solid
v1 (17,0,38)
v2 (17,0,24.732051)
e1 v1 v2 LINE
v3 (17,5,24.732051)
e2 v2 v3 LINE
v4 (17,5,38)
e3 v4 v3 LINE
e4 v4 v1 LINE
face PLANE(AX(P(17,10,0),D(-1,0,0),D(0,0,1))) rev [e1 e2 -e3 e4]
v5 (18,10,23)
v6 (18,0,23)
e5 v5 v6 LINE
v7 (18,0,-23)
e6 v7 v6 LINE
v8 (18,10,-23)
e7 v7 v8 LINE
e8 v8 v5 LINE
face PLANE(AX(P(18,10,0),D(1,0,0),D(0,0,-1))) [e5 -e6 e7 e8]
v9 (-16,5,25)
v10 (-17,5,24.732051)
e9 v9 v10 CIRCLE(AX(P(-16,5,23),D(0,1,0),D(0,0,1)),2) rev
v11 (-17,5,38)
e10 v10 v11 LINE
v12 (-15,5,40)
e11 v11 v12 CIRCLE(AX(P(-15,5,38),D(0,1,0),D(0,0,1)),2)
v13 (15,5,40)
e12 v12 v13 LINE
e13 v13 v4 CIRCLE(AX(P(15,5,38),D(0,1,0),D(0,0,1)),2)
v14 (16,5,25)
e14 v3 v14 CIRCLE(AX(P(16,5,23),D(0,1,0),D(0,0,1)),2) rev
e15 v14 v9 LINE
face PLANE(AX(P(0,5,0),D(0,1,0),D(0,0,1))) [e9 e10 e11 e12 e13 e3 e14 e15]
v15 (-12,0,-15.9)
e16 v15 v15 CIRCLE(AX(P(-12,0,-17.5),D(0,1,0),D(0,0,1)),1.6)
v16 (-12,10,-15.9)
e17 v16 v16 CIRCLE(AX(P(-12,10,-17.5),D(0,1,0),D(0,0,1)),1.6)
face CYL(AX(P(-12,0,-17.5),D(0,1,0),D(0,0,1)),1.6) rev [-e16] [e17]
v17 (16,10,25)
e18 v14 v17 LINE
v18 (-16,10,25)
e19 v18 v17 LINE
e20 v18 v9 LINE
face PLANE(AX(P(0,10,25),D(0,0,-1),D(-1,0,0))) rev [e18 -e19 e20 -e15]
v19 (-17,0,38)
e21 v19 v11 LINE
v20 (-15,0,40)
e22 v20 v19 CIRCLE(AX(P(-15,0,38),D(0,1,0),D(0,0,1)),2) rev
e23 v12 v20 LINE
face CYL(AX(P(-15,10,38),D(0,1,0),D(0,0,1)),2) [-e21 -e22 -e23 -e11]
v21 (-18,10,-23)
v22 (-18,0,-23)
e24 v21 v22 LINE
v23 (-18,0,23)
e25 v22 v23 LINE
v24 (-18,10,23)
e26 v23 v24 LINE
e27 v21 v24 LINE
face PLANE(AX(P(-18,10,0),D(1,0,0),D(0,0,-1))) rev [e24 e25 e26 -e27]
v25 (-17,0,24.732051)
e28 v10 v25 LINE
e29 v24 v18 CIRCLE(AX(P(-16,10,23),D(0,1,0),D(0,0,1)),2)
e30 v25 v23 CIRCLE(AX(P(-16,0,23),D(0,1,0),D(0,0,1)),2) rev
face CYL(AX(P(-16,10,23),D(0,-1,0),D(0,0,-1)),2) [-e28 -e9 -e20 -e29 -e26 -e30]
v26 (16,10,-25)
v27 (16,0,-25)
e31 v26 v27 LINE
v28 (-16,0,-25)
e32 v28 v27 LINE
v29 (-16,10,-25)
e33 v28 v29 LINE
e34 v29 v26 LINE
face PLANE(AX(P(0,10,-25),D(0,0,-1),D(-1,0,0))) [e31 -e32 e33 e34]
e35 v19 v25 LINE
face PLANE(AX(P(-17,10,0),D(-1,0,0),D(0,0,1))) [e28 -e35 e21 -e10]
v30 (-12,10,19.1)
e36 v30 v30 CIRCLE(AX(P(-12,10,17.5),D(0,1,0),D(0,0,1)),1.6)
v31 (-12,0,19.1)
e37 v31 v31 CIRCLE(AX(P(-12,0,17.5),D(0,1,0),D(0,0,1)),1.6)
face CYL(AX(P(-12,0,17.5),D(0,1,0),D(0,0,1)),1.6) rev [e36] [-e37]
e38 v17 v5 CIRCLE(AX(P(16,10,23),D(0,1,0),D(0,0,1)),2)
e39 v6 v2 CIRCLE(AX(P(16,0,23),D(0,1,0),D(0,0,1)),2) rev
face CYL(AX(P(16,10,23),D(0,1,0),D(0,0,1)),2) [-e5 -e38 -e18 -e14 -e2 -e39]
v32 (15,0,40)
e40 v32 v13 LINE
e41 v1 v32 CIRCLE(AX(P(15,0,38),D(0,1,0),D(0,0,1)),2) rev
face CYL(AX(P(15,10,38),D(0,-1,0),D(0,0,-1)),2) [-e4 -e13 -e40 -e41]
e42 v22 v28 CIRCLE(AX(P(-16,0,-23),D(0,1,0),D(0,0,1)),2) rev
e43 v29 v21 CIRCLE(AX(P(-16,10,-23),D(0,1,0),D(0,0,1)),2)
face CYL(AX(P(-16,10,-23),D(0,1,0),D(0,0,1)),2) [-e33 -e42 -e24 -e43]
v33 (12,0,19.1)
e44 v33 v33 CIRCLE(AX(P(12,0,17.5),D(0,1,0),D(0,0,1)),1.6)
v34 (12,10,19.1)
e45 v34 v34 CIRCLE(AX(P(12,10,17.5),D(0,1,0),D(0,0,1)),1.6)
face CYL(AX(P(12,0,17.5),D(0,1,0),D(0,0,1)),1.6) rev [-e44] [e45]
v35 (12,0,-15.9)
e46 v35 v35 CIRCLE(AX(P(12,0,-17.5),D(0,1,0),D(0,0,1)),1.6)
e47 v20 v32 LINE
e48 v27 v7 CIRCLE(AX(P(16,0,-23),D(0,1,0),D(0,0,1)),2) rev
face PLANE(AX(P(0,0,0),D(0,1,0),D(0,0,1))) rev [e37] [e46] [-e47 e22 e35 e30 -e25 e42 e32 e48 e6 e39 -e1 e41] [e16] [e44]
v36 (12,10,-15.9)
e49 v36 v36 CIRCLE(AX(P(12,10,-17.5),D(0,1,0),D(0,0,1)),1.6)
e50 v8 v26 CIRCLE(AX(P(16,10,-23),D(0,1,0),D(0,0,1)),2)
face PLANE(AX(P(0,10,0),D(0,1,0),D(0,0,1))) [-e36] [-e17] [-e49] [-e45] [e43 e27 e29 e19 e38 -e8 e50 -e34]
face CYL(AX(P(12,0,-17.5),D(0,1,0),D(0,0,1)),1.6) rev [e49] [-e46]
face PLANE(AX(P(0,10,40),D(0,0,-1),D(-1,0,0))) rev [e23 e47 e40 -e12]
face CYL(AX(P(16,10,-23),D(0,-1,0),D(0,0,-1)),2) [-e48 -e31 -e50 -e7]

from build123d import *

# Parameters (mm, degrees)
SKETCH_1_W          = 36
SKETCH_1_H          = 50
SKETCH_1_W_2        = 34
SKETCH_1_H_2        = 15
EXTRUDE_1_DEPTH     = 10
SKETCH_2_R          = 1.6
CUT_EXTRUDE_1_DEPTH = 10
SKETCH_3_W          = 34
SKETCH_3_H          = 15
CUT_EXTRUDE_2_DEPTH = 5
FILLET_1_R          = 2


with BuildPart() as part:
    # 草图1 → 凸台-拉伸1 (new body)
    with BuildSketch(Plane(origin=(0, 0, 0), x_dir=(1, 0, 0), z_dir=(0, 1, 0))):
        Rectangle(SKETCH_1_W, SKETCH_1_H)
        with Locations((0, -32.5)):
            Rectangle(SKETCH_1_W_2, SKETCH_1_H_2)
    extrude(amount=EXTRUDE_1_DEPTH)

    # 草图2 → 切除-拉伸1 (cut)
    with BuildSketch(Plane(origin=(0, 10, 0), x_dir=(1, 0, 0), z_dir=(0, 1, 0))):
        with Locations(Location((12, 17.5, 0), (0, 0, 270))):
            Circle(SKETCH_2_R)
        with Locations(Location((-12, 17.5, 0), (0, 0, 270))):
            Circle(SKETCH_2_R)
        with Locations(Location((-12, -17.5, 0), (0, 0, 270))):
            Circle(SKETCH_2_R)
        with Locations(Location((12, -17.5, 0), (0, 0, 270))):
            Circle(SKETCH_2_R)
    extrude(amount=-CUT_EXTRUDE_1_DEPTH, mode=Mode.SUBTRACT)

    # 草图3 → 切除-拉伸2 (cut)
    with BuildSketch(Plane(origin=(0, 10, 0), x_dir=(1, 0, 0), z_dir=(0, 1, 0))):
        with Locations((0, -32.5)):
            Rectangle(SKETCH_3_W, SKETCH_3_H)
    extrude(amount=-CUT_EXTRUDE_2_DEPTH, mode=Mode.SUBTRACT)

    # 圆角1
    # the kernel refuses this fillet: 2 mm, written as the material it takes off along each edge
    with BuildSketch(Plane(origin=(18, -5, -25), x_dir=(0, 0, 1), z_dir=(0, 1, 0))) as fillet_1_piece_1:
        with BuildLine():
            CenterArc((FILLET_1_R, -FILLET_1_R), FILLET_1_R, 90, 90)
            Line((0, -FILLET_1_R), (0, 0))
            Line((0, 0), (FILLET_1_R, 0))
        make_face()
    extrude(amount=20, mode=Mode.SUBTRACT)
    with BuildSketch(Plane(origin=(17, -5, 40), x_dir=(-1, 0, 0), z_dir=(0, 1, 0)), Plane(origin=(-17, -5, 40), x_dir=(0, 0, -1), z_dir=(0, 1, 0))) as fillet_1_piece_2:
        with BuildLine():
            CenterArc((FILLET_1_R, -FILLET_1_R), FILLET_1_R, 90, 90)
            Line((0, -FILLET_1_R), (0, 0))
            Line((0, 0), (FILLET_1_R, 0))
        make_face()
    extrude(amount=15, mode=Mode.SUBTRACT)
    with BuildSketch(Plane(origin=(-18, -5, 25), x_dir=(0, 0, -1), z_dir=(0, 1, 0))) as fillet_1_piece_3_section:
        with BuildLine():
            CenterArc((FILLET_1_R, -FILLET_1_R), FILLET_1_R, 90, 90)
            Line((0, -FILLET_1_R), (0, 0))
            Line((0, 0), (FILLET_1_R, 0))
        make_face()
    fillet_1_piece_3 = extrude(amount=20, mode=Mode.PRIVATE)
    fillet_1_piece_3 = split(fillet_1_piece_3, bisect_by=Plane(origin=(-17, 2.5, 24.511950301), z_dir=(-1, 0, 0)), keep=Keep.TOP, mode=Mode.PRIVATE)
    add(fillet_1_piece_3, mode=Mode.SUBTRACT)
    with BuildSketch(Plane(origin=(-18, -5, 25), x_dir=(0, 0, -1), z_dir=(0, 1, 0))) as fillet_1_piece_4_section:
        with BuildLine():
            CenterArc((FILLET_1_R, -FILLET_1_R), FILLET_1_R, 90, 90)
            Line((0, -FILLET_1_R), (0, 0))
            Line((0, 0), (FILLET_1_R, 0))
        make_face()
    fillet_1_piece_4 = extrude(amount=20, mode=Mode.PRIVATE)
    fillet_1_piece_4 = split(fillet_1_piece_4, bisect_by=Plane(origin=(-16.753472775, 5, 24.920630815), z_dir=(0, 1, 0)), keep=Keep.TOP, mode=Mode.PRIVATE)
    add(fillet_1_piece_4, mode=Mode.SUBTRACT)
    with BuildSketch(Plane(origin=(18, -5, 25), x_dir=(0, 0, -1), z_dir=(0, 1, 0))) as fillet_1_piece_5_section:
        with BuildLine():
            CenterArc((FILLET_1_R, FILLET_1_R), FILLET_1_R, 180, 90)
            Line((0, FILLET_1_R), (0, 0))
            Line((0, 0), (FILLET_1_R, 0))
        make_face()
    fillet_1_piece_5 = extrude(amount=20, mode=Mode.PRIVATE)
    fillet_1_piece_5 = split(fillet_1_piece_5, bisect_by=Plane(origin=(17, 2.5, 24.511950301), z_dir=(1, 0, 0)), keep=Keep.TOP, mode=Mode.PRIVATE)
    add(fillet_1_piece_5, mode=Mode.SUBTRACT)
    with BuildSketch(Plane(origin=(18, -5, 25), x_dir=(0, 0, -1), z_dir=(0, 1, 0))) as fillet_1_piece_6_section:
        with BuildLine():
            CenterArc((FILLET_1_R, FILLET_1_R), FILLET_1_R, 180, 90)
            Line((0, FILLET_1_R), (0, 0))
            Line((0, 0), (FILLET_1_R, 0))
        make_face()
    fillet_1_piece_6 = extrude(amount=20, mode=Mode.PRIVATE)
    fillet_1_piece_6 = split(fillet_1_piece_6, bisect_by=Plane(origin=(16.753472775, 5, 24.920630815), z_dir=(0, 1, 0)), keep=Keep.TOP, mode=Mode.PRIVATE)
    add(fillet_1_piece_6, mode=Mode.SUBTRACT)
    with BuildSketch(Plane(origin=(-18, -5, -25), x_dir=(0, 0, 1), z_dir=(0, 1, 0))) as fillet_1_piece_7:
        with BuildLine():
            CenterArc((FILLET_1_R, FILLET_1_R), FILLET_1_R, 180, 90)
            Line((0, FILLET_1_R), (0, 0))
            Line((0, 0), (FILLET_1_R, 0))
        make_face()
    extrude(amount=20, mode=Mode.SUBTRACT)


solid = part.part
